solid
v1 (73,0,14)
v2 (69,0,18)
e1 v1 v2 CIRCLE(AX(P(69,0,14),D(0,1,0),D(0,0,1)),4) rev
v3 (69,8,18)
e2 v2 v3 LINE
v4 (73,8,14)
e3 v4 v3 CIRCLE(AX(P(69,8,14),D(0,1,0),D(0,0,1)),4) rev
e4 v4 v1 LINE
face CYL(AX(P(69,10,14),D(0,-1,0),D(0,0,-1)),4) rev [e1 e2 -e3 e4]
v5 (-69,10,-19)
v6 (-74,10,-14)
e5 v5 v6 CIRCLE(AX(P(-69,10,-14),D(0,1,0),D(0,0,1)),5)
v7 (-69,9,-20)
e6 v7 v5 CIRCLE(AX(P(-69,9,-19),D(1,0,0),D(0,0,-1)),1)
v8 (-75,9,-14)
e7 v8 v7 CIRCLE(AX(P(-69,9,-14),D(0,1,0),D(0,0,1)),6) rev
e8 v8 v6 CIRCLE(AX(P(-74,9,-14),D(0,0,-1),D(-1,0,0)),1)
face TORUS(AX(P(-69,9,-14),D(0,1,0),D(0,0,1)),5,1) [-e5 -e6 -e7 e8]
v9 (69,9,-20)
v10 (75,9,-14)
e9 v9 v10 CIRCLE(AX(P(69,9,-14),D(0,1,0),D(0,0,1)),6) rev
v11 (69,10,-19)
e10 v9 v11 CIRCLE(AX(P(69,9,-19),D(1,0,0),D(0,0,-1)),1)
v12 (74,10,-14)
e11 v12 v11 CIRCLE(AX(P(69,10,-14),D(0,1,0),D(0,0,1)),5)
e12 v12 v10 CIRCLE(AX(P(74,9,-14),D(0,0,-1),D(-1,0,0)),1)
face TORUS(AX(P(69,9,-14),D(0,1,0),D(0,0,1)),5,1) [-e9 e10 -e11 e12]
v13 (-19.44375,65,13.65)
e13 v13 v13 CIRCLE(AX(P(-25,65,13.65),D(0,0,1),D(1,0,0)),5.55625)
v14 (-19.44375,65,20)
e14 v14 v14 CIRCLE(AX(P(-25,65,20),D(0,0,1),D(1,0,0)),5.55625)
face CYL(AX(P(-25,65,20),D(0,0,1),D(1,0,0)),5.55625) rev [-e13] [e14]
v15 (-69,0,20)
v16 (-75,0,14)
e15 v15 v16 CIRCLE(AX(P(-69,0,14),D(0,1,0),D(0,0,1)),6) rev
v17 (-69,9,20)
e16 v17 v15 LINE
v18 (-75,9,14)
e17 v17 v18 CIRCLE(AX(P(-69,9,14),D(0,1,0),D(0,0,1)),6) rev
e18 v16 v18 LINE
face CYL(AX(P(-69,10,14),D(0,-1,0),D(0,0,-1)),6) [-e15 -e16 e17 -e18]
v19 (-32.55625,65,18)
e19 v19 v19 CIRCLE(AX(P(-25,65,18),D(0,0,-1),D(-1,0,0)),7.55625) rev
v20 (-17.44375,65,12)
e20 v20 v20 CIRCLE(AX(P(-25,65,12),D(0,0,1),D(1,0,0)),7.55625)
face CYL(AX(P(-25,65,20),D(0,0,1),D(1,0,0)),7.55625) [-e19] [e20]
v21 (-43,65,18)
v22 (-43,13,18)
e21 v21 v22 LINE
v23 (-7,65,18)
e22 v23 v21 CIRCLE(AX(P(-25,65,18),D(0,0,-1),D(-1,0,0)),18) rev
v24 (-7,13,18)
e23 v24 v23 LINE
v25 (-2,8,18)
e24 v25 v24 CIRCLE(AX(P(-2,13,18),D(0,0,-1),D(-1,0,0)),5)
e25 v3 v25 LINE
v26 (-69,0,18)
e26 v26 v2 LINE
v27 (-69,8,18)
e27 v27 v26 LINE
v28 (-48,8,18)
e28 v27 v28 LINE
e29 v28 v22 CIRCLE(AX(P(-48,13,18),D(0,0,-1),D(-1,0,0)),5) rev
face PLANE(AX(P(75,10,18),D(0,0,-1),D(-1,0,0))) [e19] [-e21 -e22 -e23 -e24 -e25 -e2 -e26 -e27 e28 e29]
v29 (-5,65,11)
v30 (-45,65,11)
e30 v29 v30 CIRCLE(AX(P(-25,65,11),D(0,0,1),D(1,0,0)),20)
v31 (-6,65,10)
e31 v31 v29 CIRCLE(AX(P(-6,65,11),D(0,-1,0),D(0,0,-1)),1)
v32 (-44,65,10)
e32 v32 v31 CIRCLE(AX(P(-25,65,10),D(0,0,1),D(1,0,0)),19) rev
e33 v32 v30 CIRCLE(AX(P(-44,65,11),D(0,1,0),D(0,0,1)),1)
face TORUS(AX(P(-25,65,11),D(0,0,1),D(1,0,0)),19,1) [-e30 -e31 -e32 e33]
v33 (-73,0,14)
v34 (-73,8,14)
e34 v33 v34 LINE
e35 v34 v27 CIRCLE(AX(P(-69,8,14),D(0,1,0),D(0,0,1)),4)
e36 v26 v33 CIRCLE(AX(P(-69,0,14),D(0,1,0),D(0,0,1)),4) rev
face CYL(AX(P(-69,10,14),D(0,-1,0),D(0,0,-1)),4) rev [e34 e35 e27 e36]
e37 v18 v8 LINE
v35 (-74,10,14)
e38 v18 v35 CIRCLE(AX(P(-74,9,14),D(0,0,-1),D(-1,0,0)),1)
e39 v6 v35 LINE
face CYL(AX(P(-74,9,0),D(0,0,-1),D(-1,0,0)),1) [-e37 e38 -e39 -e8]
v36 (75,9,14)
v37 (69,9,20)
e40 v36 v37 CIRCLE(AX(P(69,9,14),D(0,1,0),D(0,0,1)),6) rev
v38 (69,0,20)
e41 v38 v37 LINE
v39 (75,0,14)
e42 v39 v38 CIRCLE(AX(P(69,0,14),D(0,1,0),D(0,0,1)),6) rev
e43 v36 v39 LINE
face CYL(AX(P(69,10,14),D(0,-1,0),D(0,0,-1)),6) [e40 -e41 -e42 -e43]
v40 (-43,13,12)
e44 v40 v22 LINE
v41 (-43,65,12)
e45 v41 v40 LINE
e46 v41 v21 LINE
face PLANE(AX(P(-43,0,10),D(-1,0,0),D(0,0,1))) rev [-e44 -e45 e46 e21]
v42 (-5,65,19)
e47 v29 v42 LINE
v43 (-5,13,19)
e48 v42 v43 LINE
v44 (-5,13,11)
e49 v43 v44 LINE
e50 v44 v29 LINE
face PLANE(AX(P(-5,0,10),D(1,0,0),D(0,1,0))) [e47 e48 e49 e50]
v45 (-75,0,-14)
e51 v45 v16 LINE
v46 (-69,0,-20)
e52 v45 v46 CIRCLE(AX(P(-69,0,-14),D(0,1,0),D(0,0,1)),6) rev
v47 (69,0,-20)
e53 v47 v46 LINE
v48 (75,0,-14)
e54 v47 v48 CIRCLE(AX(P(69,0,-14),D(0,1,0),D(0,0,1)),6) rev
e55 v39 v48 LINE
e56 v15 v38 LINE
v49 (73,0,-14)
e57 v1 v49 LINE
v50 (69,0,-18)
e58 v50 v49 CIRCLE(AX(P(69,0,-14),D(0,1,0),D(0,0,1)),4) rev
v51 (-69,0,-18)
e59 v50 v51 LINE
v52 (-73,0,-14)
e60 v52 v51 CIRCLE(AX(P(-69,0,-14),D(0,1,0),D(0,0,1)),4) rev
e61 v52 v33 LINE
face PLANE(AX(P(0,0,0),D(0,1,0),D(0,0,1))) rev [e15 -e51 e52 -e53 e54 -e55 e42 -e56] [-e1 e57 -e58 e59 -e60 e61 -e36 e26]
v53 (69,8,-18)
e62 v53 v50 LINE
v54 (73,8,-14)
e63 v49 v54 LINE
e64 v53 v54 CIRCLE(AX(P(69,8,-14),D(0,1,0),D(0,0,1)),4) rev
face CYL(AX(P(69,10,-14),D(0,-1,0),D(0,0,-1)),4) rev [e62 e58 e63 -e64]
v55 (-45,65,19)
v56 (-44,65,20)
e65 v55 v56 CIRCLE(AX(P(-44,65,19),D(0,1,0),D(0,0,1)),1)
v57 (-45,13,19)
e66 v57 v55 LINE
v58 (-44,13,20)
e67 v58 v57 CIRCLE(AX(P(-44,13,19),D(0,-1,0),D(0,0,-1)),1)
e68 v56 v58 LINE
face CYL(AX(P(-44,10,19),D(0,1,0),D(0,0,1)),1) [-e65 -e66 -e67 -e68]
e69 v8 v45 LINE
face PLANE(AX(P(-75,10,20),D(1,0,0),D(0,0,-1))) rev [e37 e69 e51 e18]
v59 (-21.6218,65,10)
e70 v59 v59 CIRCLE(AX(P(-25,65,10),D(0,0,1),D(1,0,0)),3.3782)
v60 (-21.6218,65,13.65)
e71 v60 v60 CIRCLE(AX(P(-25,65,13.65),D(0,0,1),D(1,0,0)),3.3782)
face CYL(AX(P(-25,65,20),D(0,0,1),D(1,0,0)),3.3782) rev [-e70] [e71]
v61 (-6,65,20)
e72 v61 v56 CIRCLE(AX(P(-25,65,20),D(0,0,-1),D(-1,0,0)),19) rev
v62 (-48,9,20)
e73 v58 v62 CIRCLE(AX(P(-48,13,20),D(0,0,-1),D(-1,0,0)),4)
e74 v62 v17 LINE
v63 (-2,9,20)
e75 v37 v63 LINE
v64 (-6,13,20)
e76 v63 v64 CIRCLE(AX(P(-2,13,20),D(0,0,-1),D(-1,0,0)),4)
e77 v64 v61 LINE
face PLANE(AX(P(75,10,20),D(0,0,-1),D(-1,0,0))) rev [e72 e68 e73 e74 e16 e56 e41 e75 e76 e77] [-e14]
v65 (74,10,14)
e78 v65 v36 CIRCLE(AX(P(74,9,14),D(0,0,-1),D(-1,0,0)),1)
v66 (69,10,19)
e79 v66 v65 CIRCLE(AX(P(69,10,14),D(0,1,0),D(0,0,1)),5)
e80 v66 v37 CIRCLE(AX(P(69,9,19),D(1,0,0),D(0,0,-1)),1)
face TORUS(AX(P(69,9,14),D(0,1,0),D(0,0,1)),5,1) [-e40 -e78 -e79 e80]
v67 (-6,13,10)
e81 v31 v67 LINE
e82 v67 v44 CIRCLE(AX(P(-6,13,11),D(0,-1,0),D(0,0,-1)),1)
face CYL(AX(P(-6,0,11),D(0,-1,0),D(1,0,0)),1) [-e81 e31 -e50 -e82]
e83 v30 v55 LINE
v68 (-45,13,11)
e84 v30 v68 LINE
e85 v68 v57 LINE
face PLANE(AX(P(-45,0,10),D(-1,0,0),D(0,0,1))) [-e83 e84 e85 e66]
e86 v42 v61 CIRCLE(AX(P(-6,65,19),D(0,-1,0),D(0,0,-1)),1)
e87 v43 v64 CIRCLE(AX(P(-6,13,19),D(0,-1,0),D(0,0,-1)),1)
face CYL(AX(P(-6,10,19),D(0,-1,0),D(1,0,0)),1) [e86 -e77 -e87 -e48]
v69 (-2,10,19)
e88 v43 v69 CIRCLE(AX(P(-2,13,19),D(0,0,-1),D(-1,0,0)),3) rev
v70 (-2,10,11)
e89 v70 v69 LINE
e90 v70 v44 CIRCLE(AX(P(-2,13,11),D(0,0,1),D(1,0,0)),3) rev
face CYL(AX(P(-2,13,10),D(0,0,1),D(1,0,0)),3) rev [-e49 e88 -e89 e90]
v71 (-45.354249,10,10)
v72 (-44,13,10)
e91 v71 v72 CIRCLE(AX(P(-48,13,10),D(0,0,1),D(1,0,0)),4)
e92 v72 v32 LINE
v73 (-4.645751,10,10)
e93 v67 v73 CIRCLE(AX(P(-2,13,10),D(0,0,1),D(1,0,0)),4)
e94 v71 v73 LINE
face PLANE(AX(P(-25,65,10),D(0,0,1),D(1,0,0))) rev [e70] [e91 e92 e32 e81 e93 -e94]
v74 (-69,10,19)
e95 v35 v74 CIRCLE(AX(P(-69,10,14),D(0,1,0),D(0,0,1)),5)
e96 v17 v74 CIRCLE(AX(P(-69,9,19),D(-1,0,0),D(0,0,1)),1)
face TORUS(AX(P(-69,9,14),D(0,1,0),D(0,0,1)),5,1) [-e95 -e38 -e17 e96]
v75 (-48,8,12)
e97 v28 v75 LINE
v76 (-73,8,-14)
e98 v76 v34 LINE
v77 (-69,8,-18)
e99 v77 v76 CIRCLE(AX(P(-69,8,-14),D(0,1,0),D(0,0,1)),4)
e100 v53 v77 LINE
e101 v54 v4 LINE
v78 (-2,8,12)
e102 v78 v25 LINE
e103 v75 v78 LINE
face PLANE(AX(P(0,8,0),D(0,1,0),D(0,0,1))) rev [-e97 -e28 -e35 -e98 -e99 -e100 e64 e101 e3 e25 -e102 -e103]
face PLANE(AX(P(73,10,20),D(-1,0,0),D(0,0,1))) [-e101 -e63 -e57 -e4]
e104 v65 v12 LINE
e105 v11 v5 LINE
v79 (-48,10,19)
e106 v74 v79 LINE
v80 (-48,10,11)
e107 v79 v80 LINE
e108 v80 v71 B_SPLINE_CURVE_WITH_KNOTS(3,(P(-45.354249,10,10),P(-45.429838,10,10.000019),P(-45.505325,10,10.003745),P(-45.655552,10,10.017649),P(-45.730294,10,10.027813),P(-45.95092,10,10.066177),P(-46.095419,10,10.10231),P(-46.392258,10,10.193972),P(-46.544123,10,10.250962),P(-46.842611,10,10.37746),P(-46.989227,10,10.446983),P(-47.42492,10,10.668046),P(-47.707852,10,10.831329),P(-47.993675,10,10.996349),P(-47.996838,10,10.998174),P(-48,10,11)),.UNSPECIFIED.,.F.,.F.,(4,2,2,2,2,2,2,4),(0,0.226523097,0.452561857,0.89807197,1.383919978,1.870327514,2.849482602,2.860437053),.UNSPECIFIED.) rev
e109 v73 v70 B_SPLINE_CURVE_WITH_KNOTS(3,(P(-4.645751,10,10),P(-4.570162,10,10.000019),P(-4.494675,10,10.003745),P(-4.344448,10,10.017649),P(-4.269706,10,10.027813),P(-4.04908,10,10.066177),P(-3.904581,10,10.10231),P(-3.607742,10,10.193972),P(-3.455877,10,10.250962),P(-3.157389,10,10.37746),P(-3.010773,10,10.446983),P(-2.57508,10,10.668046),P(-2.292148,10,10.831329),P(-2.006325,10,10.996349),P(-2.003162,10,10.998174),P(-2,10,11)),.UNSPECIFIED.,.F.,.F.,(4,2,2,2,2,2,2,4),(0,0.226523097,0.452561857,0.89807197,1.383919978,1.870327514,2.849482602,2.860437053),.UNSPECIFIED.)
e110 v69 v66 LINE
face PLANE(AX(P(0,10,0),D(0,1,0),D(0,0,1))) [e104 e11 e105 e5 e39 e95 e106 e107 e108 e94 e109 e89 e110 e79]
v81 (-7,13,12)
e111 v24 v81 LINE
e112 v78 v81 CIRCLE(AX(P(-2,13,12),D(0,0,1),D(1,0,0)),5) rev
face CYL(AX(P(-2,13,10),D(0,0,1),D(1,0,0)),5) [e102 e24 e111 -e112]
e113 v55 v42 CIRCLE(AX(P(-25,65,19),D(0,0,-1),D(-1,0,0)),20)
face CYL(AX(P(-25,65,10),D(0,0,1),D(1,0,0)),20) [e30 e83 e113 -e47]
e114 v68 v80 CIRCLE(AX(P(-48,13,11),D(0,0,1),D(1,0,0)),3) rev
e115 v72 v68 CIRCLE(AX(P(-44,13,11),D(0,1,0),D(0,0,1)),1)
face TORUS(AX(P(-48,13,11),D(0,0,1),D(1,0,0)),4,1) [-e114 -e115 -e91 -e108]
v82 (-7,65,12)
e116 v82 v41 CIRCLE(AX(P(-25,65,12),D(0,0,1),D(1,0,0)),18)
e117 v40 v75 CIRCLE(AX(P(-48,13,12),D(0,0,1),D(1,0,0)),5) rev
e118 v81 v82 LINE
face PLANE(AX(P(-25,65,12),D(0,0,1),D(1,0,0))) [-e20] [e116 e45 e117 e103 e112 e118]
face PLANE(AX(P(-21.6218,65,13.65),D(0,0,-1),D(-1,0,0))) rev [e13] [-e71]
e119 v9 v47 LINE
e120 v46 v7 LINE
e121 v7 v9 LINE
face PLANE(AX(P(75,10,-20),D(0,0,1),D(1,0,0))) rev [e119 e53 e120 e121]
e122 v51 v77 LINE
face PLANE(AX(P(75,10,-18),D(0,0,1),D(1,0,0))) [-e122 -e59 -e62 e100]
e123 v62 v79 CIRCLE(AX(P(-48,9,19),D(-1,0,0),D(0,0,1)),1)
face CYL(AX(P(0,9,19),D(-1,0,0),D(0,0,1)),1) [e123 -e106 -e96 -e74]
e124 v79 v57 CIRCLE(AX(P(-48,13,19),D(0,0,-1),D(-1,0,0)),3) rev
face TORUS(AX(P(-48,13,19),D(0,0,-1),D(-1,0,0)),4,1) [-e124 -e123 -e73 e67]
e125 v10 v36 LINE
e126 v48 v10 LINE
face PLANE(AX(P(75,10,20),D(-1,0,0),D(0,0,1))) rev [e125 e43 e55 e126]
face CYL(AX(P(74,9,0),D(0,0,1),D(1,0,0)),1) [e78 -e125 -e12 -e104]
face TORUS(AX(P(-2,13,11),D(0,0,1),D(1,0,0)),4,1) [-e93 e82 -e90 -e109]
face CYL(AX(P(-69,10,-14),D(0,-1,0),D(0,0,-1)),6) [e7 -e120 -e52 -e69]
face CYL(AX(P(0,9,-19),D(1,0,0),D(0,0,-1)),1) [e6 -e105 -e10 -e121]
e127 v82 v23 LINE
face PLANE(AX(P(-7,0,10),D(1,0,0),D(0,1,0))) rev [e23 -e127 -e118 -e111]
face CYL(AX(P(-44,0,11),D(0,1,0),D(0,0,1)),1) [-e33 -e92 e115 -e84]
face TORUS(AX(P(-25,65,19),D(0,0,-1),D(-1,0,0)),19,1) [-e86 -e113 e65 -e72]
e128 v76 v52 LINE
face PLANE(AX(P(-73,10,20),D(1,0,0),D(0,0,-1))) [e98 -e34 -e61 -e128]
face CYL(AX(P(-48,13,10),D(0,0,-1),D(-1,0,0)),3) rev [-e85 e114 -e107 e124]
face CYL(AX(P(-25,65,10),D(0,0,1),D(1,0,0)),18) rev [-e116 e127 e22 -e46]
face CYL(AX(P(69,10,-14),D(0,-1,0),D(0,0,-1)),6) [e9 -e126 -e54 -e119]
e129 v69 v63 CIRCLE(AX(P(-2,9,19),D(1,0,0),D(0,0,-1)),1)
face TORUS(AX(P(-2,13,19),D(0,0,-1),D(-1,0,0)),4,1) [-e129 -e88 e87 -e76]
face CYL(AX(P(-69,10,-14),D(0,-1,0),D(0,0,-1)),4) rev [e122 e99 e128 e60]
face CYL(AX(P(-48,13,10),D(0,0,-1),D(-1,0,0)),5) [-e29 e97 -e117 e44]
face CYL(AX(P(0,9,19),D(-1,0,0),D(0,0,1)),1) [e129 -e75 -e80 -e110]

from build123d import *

# Parameters (mm, degrees)
SKETCH1_W                                        = 150
SKETCH1_H                                        = 40
BOSS_EXTRUDE1_DEPTH                              = 10
BOSS_EXTRUDE2_DEPTH                              = 10
CBORE_FOR_1_4_SOCKET_HEAD_CAP_SCREW1_D           = 6.7564
CBORE_FOR_1_4_SOCKET_HEAD_CAP_SCREW1_CBORE_D     = 11.1125
CBORE_FOR_1_4_SOCKET_HEAD_CAP_SCREW1_CBORE_DEPTH = 6.35
FILLET1_R                                        = 6
FILLET2_R                                        = 3
FILLET3_R                                        = 1
SHELL4_START                                     = -14
SHELL4_OUTLINE_W                                 = 146
SHELL4_OUTLINE_H                                 = 8
SHELL4_DEPTH                                     = 28
SHELL4_START_2                                   = 12
SHELL4_2_OUTLINE_R                               = 7.55625
SHELL4_2_DEPTH                                   = 6
SHELL4_3_DEPTH                                   = 8


with BuildPart() as part:
    # Sketch1 → Boss-Extrude1 (new body)
    with BuildSketch(Plane(origin=(0, 0, 0), x_dir=(1, 0, 0), z_dir=(0, 1, 0))):
        Rectangle(SKETCH1_W, SKETCH1_H)
    extrude(amount=BOSS_EXTRUDE1_DEPTH)

    # Sketch2 → Boss-Extrude2 (add)
    with BuildSketch(Plane.XY.offset(20)):
        with BuildLine():
            Line((-45, 0), (-5, 0))
            Line((-5, 0), (-5, 65))
            ThreePointArc((-5, 65), (-25, 85), (-45, 65))
            Line((-45, 65), (-45, 0))
        make_face()
    extrude(amount=-BOSS_EXTRUDE2_DEPTH)

    # CBORE for 1/4 Socket Head Cap Screw1 (through all)
    with Locations(Plane.XY.offset(20)):
        with Locations((-25, 65)):
            CounterBoreHole(CBORE_FOR_1_4_SOCKET_HEAD_CAP_SCREW1_D / 2, CBORE_FOR_1_4_SOCKET_HEAD_CAP_SCREW1_CBORE_D / 2, CBORE_FOR_1_4_SOCKET_HEAD_CAP_SCREW1_CBORE_DEPTH)

    # Fillet1
    fillet1_edges = [part.edges().sort_by_distance(p)[0] for p in [
        (-75, 5, -20),
        (75, 5, -20),
        (75, 5, 20),
        (-75, 5, 20),
    ]]
    fillet(fillet1_edges, radius=FILLET1_R)

    # Fillet2
    fillet2_edges = [part.edges().sort_by_distance(p)[0] for p in [
        (-45, 10, 15),
        (-5, 10, 15),
    ]]
    fillet(fillet2_edges, radius=FILLET2_R)

    # Fillet3
    fillet3_edges = [part.edges().sort_by_distance(p)[0] for p in [
        (-45, 39, 10),
        (-25, 85, 10),
        (-45, 39, 20),
        (-25, 85, 20),
        (0, 10, -20),
        (75, 10, 0),
        (-75, 10, 0),
        (-58.5, 10, 20),
        (73.242640687, 10, 18.242640687),
        (-73.242640687, 10, 18.242640687),
        (-73.242640687, 10, -18.242640687),
        (73.242640687, 10, -18.242640687),
        (33.5, 10, 20),
        (-5, 39, 20),
        (-5, 39, 10),
        (-45.878679656, 10.878679656, 20),
        (-45.878679656, 10.878679656, 10),
        (-4.121320344, 10.878679656, 10),
        (-4.121320344, 10.878679656, 20),
    ]]
    fillet(fillet3_edges, radius=FILLET3_R)

    # Shell4: read off the stored shape, not the designer's step
    # Shell4 outline → Shell4 (cut)
    with BuildSketch(Plane.XY.offset(SHELL4_START)):
        with Locations((0, 4)):
            Rectangle(SHELL4_OUTLINE_W, SHELL4_OUTLINE_H)
    extrude(amount=SHELL4_DEPTH, mode=Mode.SUBTRACT)

    # Shell4 2 outline → Shell4 2 (cut)
    with BuildSketch(Plane.XY.offset(SHELL4_START_2)):
        with BuildLine():
            ThreePointArc((-43, 13), (-44.464466094, 9.464466094), (-48, 8))
            Line((-48, 8), (-2, 8))
            ThreePointArc((-2, 8), (-5.535533906, 9.464466094), (-7, 13))
            Line((-7, 13), (-7, 65))
            ThreePointArc((-7, 65), (-25, 83), (-43, 65))
            Line((-43, 65), (-43, 13))
        make_face()
        with Locations((-25, 65)):
            Circle(SHELL4_2_OUTLINE_R, mode=Mode.SUBTRACT)
    extrude(amount=SHELL4_2_DEPTH, mode=Mode.SUBTRACT)

    # Shell4 3 outline → Shell4 3 (cut)
    with BuildSketch(Plane(origin=(0, 0, 0), x_dir=(1, 0, 0), z_dir=(0, 1, 0))):
        with BuildLine():
            Line((-69, -18), (69, -18))
            ThreePointArc((69, -18), (71.828427125, -16.828427125), (73, -14))
            Line((73, -14), (-73, -14))
            ThreePointArc((-73, -14), (-71.828427125, -16.828427125), (-69, -18))
        make_face()
        with BuildLine():
            Line((69, 18), (-69, 18))
            ThreePointArc((-69, 18), (-71.828427125, 16.828427125), (-73, 14))
            Line((-73, 14), (73, 14))
            ThreePointArc((73, 14), (71.828427125, 16.828427125), (69, 18))
        make_face()
    extrude(amount=SHELL4_3_DEPTH, mode=Mode.SUBTRACT)


solid = part.part
